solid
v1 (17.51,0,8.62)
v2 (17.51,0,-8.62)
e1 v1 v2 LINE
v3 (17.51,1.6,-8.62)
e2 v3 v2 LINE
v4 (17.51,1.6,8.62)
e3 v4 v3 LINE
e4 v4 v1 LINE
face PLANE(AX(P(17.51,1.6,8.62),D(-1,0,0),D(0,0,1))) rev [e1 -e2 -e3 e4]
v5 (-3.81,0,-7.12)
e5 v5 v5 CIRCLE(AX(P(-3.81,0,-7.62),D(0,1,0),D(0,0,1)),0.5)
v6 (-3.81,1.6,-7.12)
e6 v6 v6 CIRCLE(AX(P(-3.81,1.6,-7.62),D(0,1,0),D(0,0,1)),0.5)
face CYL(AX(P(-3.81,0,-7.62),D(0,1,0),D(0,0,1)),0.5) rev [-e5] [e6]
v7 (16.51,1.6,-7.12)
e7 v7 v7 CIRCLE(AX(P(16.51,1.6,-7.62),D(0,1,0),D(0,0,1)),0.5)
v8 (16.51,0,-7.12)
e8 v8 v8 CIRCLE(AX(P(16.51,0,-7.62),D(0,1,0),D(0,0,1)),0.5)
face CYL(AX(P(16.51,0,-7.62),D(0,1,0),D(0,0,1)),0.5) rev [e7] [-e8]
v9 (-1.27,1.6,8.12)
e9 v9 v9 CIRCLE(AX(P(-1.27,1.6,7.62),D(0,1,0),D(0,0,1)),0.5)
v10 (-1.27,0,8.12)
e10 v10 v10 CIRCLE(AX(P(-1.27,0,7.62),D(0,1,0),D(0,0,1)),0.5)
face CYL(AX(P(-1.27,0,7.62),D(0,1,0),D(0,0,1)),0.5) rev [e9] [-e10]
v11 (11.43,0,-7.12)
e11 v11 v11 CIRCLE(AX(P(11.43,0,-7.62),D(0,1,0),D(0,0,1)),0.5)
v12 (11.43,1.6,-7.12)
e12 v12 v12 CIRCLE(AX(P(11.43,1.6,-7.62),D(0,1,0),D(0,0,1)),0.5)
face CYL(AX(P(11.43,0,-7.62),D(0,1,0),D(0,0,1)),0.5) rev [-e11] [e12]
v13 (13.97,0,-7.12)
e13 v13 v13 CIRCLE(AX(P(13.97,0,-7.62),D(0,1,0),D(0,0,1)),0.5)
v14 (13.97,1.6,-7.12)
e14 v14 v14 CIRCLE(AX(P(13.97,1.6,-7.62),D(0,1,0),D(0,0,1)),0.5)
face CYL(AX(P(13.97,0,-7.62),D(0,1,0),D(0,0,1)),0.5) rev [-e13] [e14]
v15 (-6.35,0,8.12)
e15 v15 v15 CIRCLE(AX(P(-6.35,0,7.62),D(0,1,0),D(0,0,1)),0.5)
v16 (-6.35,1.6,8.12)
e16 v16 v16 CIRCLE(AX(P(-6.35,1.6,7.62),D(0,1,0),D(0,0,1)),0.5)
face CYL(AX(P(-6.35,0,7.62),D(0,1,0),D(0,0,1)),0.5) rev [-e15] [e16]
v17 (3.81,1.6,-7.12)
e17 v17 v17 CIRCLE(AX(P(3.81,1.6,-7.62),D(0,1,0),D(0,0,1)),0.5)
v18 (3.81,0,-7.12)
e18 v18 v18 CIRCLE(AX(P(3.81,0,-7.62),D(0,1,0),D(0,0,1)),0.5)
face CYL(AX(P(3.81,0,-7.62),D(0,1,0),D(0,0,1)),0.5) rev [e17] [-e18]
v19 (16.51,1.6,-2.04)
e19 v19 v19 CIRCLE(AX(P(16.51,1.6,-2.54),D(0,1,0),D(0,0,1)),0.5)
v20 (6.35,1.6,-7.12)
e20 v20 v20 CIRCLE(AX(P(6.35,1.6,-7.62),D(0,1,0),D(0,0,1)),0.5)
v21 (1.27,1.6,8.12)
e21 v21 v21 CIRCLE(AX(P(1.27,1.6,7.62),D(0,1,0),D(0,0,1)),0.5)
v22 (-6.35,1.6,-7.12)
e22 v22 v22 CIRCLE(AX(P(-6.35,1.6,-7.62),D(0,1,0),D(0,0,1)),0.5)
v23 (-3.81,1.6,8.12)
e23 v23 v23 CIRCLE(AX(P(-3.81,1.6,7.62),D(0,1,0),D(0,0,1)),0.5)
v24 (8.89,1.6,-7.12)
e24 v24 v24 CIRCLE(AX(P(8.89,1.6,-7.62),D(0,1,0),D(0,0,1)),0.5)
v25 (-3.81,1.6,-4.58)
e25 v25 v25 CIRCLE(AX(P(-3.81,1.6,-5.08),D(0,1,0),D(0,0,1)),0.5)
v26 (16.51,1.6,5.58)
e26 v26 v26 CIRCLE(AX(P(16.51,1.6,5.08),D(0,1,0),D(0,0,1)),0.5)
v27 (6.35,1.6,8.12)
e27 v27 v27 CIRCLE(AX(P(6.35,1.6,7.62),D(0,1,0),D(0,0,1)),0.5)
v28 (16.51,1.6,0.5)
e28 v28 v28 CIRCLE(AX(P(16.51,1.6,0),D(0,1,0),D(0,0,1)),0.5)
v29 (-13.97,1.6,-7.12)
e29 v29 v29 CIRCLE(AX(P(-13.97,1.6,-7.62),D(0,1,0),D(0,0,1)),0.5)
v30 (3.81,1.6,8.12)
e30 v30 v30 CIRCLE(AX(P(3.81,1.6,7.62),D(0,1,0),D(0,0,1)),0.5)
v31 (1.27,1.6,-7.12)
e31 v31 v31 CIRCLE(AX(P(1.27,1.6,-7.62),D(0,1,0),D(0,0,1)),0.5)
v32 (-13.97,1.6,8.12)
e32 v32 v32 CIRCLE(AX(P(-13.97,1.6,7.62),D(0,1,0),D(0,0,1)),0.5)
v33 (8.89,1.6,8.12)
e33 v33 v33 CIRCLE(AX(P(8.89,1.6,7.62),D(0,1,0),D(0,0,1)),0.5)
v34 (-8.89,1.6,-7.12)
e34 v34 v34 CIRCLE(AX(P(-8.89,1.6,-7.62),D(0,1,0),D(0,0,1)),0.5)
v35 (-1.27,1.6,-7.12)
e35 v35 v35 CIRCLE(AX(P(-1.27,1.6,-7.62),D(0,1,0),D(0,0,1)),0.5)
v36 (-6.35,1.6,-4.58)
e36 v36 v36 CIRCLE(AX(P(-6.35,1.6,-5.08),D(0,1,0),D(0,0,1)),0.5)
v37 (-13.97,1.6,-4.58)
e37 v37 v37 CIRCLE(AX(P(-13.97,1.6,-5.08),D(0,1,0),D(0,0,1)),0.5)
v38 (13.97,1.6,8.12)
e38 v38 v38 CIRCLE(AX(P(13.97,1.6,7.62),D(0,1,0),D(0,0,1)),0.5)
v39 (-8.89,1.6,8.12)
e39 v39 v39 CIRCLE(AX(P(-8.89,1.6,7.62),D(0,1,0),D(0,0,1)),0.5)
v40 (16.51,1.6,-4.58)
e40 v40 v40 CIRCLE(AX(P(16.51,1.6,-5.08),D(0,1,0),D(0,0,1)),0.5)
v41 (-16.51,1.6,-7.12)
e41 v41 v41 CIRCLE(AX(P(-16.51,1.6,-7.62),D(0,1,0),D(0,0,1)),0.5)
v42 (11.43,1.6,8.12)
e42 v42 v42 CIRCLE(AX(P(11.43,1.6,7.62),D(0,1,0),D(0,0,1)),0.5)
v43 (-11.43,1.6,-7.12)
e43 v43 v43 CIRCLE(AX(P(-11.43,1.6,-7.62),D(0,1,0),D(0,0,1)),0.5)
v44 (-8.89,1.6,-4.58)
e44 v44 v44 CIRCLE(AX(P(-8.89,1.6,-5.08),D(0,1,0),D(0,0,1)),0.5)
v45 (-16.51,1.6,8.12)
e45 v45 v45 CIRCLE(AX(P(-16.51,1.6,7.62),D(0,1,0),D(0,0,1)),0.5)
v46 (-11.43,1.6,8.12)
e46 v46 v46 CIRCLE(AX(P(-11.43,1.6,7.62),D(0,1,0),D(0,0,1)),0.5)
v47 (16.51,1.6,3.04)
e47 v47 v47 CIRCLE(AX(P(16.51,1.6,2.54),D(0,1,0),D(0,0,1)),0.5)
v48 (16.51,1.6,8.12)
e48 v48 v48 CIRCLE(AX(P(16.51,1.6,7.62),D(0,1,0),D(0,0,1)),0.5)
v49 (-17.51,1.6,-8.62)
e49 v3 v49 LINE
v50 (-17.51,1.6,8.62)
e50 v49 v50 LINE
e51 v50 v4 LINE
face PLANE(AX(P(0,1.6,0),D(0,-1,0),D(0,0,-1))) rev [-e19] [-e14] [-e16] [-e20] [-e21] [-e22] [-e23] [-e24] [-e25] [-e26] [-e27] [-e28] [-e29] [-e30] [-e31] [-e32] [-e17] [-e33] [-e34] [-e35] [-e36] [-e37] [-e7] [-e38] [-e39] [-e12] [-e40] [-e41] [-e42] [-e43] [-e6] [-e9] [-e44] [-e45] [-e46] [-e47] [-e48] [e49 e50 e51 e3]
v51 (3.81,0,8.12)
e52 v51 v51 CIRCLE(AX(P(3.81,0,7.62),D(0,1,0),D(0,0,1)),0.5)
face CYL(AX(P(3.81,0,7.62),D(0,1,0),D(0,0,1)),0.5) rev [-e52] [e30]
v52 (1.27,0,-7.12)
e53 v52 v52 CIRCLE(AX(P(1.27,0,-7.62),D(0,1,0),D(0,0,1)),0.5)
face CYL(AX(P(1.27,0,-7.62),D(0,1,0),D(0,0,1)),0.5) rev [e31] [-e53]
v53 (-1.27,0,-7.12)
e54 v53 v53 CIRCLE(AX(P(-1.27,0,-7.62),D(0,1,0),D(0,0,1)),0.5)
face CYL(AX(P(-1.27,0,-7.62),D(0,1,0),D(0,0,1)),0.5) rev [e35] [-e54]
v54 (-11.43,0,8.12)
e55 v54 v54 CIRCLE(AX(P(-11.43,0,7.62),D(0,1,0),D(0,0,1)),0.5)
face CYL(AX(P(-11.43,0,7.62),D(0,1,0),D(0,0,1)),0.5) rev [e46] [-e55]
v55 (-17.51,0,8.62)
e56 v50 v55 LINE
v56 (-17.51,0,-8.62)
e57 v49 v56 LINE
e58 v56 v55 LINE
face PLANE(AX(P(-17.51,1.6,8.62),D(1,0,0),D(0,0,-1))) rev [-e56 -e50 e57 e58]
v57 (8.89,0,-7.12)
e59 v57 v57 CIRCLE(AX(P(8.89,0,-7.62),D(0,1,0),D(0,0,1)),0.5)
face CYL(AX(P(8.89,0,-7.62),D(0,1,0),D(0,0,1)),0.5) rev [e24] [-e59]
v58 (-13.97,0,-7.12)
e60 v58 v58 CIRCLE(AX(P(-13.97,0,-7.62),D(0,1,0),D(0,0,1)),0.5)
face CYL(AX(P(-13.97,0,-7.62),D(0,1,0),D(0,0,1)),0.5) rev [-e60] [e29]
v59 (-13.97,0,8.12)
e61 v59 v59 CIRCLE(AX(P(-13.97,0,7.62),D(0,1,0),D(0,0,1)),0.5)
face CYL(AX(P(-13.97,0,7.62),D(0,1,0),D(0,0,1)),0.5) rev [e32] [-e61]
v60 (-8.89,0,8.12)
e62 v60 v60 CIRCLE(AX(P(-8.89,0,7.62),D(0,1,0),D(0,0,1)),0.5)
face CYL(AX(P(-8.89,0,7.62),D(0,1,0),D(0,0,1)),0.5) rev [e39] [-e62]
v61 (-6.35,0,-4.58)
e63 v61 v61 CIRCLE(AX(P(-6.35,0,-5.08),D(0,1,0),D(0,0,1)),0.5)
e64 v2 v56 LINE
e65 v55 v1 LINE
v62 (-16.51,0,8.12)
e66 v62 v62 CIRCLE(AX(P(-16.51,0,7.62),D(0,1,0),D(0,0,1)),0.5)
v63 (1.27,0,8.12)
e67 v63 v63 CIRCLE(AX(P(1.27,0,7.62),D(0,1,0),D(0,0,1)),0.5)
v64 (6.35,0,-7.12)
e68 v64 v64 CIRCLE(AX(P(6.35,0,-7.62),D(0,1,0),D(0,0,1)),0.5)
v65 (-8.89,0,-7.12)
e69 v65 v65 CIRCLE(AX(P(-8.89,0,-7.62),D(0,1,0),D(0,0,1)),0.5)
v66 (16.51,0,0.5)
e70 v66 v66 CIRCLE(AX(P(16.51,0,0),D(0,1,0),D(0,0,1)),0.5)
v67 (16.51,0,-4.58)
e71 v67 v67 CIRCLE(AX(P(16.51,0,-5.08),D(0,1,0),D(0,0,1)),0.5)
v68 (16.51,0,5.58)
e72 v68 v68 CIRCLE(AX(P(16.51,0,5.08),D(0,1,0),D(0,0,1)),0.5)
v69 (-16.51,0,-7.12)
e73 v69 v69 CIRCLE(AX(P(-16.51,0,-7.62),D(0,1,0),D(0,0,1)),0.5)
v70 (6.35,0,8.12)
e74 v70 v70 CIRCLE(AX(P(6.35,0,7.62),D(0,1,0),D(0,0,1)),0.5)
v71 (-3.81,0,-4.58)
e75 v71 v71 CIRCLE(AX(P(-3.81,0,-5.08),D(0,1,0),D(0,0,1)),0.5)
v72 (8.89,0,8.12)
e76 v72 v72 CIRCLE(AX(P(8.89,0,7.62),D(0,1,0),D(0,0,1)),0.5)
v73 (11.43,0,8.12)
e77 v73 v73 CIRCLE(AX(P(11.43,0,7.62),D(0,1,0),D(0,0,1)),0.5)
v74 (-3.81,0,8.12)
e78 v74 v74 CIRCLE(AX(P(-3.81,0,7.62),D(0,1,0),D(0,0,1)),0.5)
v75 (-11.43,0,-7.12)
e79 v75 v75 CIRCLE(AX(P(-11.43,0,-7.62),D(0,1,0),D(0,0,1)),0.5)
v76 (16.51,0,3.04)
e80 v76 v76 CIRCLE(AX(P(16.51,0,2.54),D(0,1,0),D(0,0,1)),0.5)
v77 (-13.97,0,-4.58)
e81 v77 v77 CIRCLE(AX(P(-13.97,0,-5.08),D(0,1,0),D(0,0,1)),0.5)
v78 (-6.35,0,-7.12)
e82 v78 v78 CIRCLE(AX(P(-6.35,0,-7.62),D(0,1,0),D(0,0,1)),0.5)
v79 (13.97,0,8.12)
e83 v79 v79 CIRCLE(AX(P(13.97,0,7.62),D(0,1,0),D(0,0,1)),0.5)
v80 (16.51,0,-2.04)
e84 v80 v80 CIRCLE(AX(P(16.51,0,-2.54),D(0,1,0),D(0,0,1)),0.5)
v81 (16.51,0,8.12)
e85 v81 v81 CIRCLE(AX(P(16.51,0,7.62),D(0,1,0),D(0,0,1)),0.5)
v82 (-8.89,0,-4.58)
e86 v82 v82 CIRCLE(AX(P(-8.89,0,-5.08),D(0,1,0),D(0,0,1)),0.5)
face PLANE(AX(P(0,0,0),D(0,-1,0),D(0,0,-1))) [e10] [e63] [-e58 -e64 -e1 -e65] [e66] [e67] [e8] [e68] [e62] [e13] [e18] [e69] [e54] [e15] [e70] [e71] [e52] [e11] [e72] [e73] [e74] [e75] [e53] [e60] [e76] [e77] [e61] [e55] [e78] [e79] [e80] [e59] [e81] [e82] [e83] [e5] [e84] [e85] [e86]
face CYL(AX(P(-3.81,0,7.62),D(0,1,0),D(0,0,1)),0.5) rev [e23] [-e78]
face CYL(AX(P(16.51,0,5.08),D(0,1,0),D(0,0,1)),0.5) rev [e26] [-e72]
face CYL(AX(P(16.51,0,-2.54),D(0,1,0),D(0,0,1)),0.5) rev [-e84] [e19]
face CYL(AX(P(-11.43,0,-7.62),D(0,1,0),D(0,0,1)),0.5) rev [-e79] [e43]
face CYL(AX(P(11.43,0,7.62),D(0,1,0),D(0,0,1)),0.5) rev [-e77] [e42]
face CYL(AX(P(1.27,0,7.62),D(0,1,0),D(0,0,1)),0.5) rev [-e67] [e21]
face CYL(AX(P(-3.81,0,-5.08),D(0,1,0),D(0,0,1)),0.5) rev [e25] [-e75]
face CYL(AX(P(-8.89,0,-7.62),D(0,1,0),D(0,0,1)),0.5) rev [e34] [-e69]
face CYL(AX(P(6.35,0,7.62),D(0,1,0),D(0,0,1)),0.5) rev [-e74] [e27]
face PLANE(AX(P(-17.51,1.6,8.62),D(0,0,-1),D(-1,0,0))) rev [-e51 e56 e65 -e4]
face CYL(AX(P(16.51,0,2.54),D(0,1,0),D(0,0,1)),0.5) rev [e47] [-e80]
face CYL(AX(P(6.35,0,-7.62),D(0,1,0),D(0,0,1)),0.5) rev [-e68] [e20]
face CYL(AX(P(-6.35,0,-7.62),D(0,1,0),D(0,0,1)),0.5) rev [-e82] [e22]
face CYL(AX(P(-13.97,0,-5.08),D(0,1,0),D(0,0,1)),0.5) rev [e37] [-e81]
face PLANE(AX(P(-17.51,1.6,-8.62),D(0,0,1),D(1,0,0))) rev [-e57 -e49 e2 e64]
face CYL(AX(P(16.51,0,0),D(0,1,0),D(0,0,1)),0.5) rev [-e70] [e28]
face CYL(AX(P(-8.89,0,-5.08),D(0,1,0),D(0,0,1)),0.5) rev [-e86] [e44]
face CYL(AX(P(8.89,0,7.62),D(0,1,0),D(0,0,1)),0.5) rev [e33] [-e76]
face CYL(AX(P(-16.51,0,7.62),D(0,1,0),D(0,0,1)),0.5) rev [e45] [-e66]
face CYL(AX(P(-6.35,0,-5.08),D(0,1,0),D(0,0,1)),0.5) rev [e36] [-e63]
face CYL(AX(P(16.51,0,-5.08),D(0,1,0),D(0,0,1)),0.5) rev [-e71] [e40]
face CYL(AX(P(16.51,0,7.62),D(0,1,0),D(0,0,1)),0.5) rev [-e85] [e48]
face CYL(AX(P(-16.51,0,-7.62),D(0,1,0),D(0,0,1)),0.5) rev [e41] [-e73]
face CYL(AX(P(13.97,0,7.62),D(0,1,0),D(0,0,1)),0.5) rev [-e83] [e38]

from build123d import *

# Parameters (mm, degrees)
SKETCH1_W           = 35.02
SKETCH1_H           = 17.24
BOSS_EXTRUDE1_DEPTH = 1.6
SKETCH2_R           = 0.5
CUT_EXTRUDE1_DEPTH  = 1.6
LPATTERN1_COUNT     = 14
LPATTERN1_PITCH     = 2.54
LPATTERN1_COL_COUNT = 7
LPATTERN1_COL_PITCH = 2.54
LPATTERN2_OUTLINE_R = 0.5
LPATTERN2_DEPTH     = 1.6
SKETCH3_R           = 0.5
CUT_EXTRUDE2_DEPTH  = 1.6


# Read off the part's stored shape, not the designer's step: LPattern2
with BuildPart() as part:
    # Sketch1 → Boss-Extrude1 (new body)
    with BuildSketch(Plane(origin=(0, 0, 0), x_dir=(1, 0, 0), z_dir=(0, 1, 0))):
        Rectangle(SKETCH1_W, SKETCH1_H)
    extrude(amount=BOSS_EXTRUDE1_DEPTH)

    # Sketch2 → Cut-Extrude1 (cut)
    with BuildSketch(Plane(origin=(0, 1.6, 0), x_dir=(1, 0, 0), z_dir=(0, 1, 0))):
        with Locations(Location((16.51, -7.62, 0), (0, 0, 270))):
            Circle(SKETCH2_R)
    cut_extrude1 = extrude(amount=-CUT_EXTRUDE1_DEPTH, mode=Mode.SUBTRACT)

    # LPattern1: Cut-Extrude1 ×14
    with Locations(*[(-i * LPATTERN1_PITCH, 0, 0) for i in range(1, LPATTERN1_COUNT)]):
        add(cut_extrude1, mode=Mode.SUBTRACT)

    # LPattern1 col: Cut-Extrude1 ×7
    with Locations(*[(0, 0, -i * LPATTERN1_COL_PITCH) for i in range(1, LPATTERN1_COL_COUNT)]):
        add(cut_extrude1, mode=Mode.SUBTRACT)

    # LPattern2 outline → LPattern2 (cut)
    with BuildSketch(Plane(origin=(0, 0, 0), x_dir=(1, 0, 0), z_dir=(0, 1, 0))):
        with Locations((-16.51, 7.62)):
            Circle(LPATTERN2_OUTLINE_R)
        with Locations((-13.97, 7.62)):
            Circle(LPATTERN2_OUTLINE_R)
        with Locations((-11.43, 7.62)):
            Circle(LPATTERN2_OUTLINE_R)
        with Locations((-8.89, 7.62)):
            Circle(LPATTERN2_OUTLINE_R)
        with Locations((-6.35, 7.62)):
            Circle(LPATTERN2_OUTLINE_R)
        with Locations((-3.81, 7.62)):
            Circle(LPATTERN2_OUTLINE_R)
        with Locations((-1.27, 7.62)):
            Circle(LPATTERN2_OUTLINE_R)
        with Locations((1.27, 7.62)):
            Circle(LPATTERN2_OUTLINE_R)
        with Locations((3.81, 7.62)):
            Circle(LPATTERN2_OUTLINE_R)
        with Locations((6.35, 7.62)):
            Circle(LPATTERN2_OUTLINE_R)
        with Locations((8.89, 7.62)):
            Circle(LPATTERN2_OUTLINE_R)
        with Locations((11.43, 7.62)):
            Circle(LPATTERN2_OUTLINE_R)
        with Locations((13.97, 7.62)):
            Circle(LPATTERN2_OUTLINE_R)
    extrude(amount=LPATTERN2_DEPTH, mode=Mode.SUBTRACT)

    # Sketch3 → Cut-Extrude2 (cut)
    with BuildSketch(Plane(origin=(0, 1.6, 0), x_dir=(1, 0, 0), z_dir=(0, 1, 0))):
        with Locations(Location((-13.97, 5.08, 0), (0, 0, 270))):
            Circle(SKETCH3_R)
        with Locations(Location((-8.89, 5.08, 0), (0, 0, 270))):
            Circle(SKETCH3_R)
        with Locations(Location((-6.35, 5.08, 0), (0, 0, 270))):
            Circle(SKETCH3_R)
        with Locations(Location((-3.81, 5.08, 0), (0, 0, 270))):
            Circle(SKETCH3_R)
    extrude(amount=-CUT_EXTRUDE2_DEPTH, mode=Mode.SUBTRACT)


solid = part.part
